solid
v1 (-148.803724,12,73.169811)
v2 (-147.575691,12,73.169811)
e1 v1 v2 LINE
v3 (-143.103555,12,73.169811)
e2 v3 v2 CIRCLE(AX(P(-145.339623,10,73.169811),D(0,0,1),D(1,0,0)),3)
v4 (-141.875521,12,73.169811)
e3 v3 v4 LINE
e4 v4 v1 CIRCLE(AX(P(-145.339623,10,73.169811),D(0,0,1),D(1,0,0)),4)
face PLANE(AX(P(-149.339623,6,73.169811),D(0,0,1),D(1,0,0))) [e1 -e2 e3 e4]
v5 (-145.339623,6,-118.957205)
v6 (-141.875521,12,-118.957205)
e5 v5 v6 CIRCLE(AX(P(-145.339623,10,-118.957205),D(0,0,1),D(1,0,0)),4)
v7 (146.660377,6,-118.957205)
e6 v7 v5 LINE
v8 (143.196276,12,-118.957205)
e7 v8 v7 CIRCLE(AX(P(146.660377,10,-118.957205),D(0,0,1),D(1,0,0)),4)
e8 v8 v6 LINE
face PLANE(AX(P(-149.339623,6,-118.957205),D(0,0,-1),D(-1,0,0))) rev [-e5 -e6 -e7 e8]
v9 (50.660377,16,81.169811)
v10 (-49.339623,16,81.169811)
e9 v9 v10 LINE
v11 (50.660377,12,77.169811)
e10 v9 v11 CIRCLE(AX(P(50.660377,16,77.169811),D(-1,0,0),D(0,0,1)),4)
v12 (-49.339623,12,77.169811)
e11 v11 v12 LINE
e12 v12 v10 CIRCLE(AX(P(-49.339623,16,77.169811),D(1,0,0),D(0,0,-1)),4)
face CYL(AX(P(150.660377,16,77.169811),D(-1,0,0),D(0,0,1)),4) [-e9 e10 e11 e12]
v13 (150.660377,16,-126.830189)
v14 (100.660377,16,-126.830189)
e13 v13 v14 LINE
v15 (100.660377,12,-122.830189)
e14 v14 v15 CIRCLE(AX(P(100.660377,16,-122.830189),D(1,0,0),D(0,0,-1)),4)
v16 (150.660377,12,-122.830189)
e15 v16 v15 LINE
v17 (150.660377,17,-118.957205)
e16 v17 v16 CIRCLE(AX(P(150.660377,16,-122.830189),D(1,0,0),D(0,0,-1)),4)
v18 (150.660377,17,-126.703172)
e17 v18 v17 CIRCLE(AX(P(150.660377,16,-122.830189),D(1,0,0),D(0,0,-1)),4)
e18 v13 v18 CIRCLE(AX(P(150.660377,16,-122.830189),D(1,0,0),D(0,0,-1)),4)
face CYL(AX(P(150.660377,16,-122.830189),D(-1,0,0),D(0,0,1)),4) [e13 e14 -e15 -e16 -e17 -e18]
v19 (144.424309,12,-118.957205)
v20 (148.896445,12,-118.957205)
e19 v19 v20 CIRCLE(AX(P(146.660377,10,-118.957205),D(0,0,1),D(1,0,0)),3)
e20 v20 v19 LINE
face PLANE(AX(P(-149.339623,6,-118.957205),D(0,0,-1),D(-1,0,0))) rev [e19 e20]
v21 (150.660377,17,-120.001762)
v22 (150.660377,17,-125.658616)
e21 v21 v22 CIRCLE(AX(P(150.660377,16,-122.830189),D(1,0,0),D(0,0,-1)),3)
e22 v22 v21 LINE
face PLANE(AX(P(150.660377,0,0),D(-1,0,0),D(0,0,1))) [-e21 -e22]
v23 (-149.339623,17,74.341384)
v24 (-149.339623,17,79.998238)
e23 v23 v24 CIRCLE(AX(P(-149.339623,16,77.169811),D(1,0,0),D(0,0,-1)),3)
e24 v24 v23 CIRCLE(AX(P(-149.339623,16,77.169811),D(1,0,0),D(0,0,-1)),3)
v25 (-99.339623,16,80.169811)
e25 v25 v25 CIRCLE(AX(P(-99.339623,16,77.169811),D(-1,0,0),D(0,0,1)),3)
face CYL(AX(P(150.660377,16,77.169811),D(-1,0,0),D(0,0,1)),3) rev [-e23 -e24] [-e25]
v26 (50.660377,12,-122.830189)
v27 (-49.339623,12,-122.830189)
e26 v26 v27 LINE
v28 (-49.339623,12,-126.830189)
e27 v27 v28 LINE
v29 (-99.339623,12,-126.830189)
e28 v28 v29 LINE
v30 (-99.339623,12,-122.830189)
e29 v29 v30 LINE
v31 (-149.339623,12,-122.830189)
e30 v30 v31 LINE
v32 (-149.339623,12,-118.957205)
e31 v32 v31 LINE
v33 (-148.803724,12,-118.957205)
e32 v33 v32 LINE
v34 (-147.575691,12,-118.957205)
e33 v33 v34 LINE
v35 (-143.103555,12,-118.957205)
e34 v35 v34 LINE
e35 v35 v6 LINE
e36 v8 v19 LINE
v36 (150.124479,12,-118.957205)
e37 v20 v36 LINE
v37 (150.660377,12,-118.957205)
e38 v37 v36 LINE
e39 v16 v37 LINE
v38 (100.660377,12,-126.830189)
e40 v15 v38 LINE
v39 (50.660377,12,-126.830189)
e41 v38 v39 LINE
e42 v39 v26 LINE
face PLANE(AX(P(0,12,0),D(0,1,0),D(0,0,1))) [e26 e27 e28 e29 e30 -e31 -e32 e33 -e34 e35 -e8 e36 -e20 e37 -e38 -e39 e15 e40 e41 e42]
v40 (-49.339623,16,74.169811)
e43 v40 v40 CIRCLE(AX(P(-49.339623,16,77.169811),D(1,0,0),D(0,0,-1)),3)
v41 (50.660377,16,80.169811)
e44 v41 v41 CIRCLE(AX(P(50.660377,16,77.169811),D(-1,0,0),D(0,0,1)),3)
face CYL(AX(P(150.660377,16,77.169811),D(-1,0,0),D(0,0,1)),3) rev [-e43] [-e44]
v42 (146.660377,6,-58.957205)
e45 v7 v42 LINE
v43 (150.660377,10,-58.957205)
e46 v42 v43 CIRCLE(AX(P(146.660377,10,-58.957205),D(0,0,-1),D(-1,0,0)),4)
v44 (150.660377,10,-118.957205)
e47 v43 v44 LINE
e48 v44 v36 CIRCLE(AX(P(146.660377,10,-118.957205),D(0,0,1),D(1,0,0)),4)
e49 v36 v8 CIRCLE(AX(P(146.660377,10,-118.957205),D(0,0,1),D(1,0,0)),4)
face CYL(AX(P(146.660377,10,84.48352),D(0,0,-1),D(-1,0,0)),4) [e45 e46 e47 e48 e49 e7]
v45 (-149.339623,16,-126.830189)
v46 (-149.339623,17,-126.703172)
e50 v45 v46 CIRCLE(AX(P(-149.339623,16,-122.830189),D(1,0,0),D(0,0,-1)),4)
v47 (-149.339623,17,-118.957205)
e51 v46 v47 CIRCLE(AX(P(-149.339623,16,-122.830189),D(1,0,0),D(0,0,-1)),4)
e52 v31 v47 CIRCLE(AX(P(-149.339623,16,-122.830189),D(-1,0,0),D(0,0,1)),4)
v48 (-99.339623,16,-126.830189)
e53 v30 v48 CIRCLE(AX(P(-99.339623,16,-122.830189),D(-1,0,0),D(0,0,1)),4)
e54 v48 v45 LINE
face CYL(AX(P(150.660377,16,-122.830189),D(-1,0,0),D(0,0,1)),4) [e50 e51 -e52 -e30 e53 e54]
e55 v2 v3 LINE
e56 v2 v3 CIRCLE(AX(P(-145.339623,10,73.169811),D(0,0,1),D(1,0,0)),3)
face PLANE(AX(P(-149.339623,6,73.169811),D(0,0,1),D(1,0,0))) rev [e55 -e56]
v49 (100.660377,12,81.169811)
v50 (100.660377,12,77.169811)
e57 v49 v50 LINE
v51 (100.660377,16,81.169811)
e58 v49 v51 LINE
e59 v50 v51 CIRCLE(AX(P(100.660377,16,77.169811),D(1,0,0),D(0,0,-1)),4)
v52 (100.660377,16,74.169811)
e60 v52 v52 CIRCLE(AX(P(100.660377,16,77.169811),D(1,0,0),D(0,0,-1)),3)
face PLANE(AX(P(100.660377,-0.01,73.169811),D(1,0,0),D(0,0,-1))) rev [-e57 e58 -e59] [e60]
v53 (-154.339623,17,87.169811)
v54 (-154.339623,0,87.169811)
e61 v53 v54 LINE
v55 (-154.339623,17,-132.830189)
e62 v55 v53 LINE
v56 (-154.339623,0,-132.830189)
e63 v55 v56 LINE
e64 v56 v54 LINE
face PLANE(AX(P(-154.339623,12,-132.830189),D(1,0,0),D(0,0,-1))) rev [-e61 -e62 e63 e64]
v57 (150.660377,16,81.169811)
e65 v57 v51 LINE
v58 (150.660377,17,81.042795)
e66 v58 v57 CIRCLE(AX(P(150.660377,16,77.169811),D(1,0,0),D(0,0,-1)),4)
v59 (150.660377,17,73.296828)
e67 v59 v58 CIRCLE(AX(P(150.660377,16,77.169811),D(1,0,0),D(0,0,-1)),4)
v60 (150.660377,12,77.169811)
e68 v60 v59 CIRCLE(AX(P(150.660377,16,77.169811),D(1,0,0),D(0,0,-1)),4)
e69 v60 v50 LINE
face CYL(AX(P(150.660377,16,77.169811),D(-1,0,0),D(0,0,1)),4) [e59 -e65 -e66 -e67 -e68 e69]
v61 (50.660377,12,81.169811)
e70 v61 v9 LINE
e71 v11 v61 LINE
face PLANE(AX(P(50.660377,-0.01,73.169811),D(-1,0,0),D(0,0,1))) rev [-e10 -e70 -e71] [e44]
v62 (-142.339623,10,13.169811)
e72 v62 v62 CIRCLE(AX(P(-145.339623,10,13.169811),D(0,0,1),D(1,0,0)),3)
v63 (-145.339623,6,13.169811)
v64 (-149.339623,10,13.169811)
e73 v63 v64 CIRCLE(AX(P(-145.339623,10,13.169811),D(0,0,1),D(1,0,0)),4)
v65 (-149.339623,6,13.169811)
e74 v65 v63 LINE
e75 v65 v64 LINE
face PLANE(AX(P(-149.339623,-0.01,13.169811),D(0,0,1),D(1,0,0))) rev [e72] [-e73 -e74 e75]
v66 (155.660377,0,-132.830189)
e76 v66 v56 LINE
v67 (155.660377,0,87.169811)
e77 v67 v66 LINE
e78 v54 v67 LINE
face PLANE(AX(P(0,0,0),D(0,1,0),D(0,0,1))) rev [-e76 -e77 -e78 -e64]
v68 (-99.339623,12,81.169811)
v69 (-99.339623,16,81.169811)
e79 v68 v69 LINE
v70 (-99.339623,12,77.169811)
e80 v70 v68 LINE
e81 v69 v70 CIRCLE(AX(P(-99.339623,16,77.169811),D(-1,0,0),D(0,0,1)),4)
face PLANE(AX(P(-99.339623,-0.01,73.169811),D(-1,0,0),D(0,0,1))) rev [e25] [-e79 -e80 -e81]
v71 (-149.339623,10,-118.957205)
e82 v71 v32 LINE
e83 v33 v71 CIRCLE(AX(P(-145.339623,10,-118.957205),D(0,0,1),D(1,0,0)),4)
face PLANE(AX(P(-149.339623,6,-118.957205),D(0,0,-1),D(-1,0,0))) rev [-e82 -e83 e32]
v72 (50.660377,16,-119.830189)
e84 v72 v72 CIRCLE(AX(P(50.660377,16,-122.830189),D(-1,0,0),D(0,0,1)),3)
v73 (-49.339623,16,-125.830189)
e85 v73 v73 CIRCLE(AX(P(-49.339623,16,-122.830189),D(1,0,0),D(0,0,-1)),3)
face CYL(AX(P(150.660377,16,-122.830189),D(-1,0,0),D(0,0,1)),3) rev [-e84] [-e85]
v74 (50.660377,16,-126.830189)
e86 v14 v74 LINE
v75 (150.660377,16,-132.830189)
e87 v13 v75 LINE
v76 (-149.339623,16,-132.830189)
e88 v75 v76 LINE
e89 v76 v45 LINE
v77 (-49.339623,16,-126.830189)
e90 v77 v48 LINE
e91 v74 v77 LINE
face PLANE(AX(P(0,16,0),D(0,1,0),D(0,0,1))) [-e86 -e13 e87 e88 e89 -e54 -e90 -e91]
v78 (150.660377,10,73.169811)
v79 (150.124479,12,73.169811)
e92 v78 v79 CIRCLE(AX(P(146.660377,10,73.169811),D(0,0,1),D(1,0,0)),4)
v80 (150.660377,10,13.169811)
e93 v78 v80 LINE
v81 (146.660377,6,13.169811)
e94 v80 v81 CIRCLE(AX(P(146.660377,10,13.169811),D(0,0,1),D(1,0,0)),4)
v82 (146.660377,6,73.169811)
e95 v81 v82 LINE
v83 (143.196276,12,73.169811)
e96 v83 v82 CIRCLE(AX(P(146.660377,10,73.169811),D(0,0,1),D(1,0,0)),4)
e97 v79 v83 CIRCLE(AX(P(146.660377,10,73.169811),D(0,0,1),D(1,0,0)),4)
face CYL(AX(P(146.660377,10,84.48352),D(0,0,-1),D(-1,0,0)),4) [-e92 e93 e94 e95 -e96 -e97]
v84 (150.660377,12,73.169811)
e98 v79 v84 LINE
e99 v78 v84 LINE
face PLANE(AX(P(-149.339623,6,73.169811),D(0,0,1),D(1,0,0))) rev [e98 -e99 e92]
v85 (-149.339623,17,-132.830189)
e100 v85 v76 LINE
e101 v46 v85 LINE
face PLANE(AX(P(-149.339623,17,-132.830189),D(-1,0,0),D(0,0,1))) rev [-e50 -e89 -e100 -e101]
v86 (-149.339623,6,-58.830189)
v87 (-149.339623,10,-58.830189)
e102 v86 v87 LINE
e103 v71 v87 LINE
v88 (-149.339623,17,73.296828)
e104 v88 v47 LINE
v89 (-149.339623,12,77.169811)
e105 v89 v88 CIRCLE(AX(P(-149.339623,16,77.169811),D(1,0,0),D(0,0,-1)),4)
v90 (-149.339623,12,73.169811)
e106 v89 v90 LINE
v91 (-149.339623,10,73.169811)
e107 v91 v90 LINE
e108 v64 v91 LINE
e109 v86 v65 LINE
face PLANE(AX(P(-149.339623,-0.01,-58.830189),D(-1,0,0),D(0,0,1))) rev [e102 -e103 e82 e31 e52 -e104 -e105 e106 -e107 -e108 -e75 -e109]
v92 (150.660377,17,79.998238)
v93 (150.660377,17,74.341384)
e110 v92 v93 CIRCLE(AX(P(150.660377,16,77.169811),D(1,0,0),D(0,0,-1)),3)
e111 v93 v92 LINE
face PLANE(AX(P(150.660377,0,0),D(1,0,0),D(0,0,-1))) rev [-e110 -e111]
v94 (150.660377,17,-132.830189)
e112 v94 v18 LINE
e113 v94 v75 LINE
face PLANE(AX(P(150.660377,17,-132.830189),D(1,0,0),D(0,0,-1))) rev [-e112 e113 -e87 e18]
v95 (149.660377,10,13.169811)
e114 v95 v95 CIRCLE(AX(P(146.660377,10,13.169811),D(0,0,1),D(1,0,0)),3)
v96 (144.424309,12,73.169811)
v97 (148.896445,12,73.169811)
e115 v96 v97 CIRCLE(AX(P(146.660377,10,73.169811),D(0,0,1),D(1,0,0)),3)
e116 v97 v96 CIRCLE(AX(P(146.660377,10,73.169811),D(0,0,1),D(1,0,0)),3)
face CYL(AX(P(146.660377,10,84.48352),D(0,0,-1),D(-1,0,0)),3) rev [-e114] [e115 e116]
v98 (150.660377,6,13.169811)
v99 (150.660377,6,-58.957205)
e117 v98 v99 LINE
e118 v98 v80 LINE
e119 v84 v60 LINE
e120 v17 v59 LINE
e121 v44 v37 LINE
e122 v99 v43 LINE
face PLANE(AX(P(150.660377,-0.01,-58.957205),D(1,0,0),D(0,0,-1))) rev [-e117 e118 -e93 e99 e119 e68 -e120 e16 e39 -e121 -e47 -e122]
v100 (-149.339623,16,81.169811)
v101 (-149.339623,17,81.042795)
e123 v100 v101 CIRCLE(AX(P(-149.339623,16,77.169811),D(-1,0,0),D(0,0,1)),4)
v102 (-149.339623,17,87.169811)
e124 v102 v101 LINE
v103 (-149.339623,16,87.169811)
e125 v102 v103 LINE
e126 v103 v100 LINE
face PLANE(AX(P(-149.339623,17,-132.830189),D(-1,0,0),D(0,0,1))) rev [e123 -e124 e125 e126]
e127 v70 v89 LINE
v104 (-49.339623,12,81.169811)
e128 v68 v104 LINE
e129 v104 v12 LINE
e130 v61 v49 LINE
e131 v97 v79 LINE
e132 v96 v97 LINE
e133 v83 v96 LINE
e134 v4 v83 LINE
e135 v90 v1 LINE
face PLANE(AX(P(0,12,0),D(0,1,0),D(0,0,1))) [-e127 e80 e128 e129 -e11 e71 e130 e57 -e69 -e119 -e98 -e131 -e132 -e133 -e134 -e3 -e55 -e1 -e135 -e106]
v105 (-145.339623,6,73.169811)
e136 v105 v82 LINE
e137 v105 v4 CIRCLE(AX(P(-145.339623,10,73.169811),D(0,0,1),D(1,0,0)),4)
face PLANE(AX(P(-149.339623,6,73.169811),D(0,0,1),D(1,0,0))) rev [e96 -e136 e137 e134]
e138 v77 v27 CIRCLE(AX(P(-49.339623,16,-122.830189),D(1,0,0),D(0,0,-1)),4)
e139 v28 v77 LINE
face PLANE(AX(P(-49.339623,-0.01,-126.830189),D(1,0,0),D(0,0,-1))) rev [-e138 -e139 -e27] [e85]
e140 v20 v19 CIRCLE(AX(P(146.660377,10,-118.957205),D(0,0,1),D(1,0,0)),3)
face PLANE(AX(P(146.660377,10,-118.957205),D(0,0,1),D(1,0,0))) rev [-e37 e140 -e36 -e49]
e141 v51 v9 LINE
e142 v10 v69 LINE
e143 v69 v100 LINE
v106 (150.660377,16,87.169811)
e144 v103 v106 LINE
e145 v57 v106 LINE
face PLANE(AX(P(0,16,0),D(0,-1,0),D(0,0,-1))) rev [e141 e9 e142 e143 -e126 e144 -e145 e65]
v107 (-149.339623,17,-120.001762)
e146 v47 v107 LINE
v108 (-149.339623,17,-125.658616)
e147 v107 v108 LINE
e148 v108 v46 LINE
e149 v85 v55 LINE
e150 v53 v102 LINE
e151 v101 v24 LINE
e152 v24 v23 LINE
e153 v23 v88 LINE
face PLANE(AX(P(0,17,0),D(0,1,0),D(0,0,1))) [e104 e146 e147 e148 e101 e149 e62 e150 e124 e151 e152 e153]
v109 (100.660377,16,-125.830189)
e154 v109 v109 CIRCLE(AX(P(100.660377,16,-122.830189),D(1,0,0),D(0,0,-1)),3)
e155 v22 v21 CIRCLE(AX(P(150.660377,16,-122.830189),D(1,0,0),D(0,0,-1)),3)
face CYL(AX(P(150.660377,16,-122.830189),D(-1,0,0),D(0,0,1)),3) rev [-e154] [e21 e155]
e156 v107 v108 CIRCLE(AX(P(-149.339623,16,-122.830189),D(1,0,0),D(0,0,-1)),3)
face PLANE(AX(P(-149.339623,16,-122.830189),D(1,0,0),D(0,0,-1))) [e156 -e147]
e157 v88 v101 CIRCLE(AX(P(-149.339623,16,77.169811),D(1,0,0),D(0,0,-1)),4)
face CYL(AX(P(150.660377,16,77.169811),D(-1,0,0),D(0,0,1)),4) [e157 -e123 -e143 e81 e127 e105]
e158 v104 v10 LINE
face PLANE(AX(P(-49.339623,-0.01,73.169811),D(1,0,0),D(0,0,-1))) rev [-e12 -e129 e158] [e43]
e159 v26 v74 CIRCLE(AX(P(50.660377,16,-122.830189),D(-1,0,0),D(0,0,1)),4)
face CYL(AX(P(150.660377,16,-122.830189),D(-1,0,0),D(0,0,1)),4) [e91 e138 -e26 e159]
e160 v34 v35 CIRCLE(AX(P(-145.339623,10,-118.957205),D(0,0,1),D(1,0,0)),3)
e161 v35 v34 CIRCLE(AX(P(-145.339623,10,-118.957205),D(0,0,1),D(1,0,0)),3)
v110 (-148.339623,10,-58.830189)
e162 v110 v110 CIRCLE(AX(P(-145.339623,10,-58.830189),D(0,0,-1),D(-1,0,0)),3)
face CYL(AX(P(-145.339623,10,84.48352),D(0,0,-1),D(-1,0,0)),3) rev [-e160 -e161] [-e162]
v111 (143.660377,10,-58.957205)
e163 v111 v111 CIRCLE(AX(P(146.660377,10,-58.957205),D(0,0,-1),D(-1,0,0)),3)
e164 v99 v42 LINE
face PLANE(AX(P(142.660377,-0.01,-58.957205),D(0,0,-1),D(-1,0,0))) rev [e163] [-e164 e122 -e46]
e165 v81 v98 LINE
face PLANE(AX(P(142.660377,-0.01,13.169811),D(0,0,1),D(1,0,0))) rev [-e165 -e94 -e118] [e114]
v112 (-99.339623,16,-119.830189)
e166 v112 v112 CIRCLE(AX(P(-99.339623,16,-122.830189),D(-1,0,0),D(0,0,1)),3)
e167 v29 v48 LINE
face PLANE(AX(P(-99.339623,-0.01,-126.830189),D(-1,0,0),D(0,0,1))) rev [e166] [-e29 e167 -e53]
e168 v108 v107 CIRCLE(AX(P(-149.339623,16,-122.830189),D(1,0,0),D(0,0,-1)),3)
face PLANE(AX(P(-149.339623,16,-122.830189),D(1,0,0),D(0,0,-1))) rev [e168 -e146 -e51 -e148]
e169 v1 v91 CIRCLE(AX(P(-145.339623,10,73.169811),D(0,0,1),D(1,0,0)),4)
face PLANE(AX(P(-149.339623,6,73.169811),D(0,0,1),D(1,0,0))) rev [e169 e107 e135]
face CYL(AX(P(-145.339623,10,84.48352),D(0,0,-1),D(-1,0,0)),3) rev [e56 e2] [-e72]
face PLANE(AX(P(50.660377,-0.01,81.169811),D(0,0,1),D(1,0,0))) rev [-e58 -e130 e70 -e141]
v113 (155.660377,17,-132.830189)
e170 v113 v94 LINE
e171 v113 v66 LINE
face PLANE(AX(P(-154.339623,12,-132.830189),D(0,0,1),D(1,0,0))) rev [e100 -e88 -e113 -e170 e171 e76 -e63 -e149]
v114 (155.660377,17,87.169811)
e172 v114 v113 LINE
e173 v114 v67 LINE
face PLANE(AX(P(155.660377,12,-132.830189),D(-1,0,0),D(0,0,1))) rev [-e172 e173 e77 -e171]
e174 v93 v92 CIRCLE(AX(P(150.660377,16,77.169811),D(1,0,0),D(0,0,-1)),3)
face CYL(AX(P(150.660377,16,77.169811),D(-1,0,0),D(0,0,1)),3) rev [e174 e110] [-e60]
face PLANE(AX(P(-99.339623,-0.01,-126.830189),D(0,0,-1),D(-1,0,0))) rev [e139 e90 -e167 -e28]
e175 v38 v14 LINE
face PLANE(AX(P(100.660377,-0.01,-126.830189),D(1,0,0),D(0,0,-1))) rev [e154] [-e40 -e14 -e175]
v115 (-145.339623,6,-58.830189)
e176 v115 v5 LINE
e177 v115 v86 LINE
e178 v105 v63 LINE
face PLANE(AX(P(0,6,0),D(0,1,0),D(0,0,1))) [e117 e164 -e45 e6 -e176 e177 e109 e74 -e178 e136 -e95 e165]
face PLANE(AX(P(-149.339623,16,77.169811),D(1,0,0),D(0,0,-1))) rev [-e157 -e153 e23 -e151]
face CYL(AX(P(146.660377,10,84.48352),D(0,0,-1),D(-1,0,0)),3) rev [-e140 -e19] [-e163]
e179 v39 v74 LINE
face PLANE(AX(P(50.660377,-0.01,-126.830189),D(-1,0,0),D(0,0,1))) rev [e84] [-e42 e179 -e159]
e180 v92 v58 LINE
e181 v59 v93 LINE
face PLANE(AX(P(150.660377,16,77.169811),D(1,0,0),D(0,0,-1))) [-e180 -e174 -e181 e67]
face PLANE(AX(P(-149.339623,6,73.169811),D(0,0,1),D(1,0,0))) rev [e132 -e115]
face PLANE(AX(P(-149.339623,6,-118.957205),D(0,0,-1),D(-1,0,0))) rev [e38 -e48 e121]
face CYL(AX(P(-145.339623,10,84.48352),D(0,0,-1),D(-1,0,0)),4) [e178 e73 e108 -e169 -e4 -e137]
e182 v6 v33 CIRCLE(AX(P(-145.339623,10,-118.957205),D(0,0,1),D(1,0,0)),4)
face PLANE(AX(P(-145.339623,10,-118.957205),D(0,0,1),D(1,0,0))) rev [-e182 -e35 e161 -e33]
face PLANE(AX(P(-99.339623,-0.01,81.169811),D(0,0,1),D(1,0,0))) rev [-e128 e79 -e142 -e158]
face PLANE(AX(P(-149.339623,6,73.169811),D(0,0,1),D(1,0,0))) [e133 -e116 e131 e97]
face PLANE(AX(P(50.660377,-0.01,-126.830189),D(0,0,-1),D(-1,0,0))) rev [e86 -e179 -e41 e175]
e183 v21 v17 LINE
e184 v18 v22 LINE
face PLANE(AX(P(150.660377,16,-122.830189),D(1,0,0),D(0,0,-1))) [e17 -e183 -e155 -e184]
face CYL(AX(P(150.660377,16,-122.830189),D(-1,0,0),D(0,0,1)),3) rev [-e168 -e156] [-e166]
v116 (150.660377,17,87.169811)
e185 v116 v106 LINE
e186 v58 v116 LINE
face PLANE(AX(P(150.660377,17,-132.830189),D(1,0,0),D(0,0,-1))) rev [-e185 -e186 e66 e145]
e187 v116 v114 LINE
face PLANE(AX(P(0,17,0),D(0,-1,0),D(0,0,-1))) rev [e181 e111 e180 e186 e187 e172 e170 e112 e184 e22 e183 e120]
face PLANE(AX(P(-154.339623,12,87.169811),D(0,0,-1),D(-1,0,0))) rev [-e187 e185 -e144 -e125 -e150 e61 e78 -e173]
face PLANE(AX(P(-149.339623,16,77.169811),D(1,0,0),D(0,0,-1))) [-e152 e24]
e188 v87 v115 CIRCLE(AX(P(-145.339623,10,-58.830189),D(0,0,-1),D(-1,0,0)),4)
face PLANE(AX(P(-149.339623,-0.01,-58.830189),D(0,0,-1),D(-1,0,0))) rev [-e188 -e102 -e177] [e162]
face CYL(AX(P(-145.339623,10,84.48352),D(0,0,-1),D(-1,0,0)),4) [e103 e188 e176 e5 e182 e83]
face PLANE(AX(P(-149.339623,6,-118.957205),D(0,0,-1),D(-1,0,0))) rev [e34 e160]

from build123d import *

# Parameters (mm, degrees)
SKETCH_1_W                 = 310
SKETCH_1_H                 = 220
EXTRUDE_1_DEPTH            = 12
SKETCH_8_W                 = 310
SKETCH_8_H                 = 10
EXTRUDE_12_DEPTH           = 4
SKETCH_10_R                = 4
CUT_EXTRUDE_5_DEPTH        = 305
SKETCH_11_W                = 4
SKETCH_11_H                = 4
EXTRUDE_13_DEPTH           = 5
EXTRUDE_START              = 300
SKETCH_12_R                = 4
SKETCH_12_R_2              = 3
EXTRUDE_1_2_DEPTH          = 300
SKETCH_15_W                = 5
SKETCH_15_H                = 220
EXTRUDE_15_DEPTH           = 5
SPLIT_START                = -99.339622642
SPLIT_BODIES_1_OUTLINE_R   = 3
SPLIT_BODIES_1_DEPTH       = 50
SPLIT_START_2              = 50.660377358
SPLIT_BODIES_1_2_OUTLINE_R = 3
SPLIT_BODIES_1_2_DEPTH     = 50
SKETCH_16_W                = 50
SKETCH_16_H                = 8
EXTRUDE_16_DEPTH           = 12
SKETCH_19_W                = 300
SKETCH_19_H                = 192.127016654
CUT_EXTRUDE_6_DEPTH        = 6
SKETCH_22_W                = 4
SKETCH_22_H                = 192.127016654
EXTRUDE_17_DEPTH           = 4
SKETCH_23_R                = 4
CUT_EXTRUDE_8_DEPTH        = 192.127016654
SKETCH_23_3_R              = 4
SKETCH_23_3_R_2            = 3
EXTRUDE_2_DEPTH            = 192.127016654
SPLIT_START_3              = -58.830188679
SPLIT_BODIES_2_OUTLINE_R   = 3
SPLIT_BODIES_2_DEPTH       = 72
SPLIT_START_4              = -58.957205333
SPLIT_BODIES_2_2_OUTLINE_R = 3
SPLIT_BODIES_2_2_DEPTH     = 0.127016654
SKETCH_24_W                = 8
SKETCH_24_H                = 72
SKETCH_24_H_2              = 72.127016654
EXTRUDE_18_DEPTH           = 6


# Read off the part's stored shape, not the designer's step: 分割1, 分割2
with BuildPart() as part:
    # 草图1 → Extrude 1 (new body)
    with BuildSketch(Plane(origin=(0, 0, 0), x_dir=(1, 0, 0), z_dir=(0, 1, 0))):
        with Locations((0.660377358, 22.830188679)):
            Rectangle(SKETCH_1_W, SKETCH_1_H)
    extrude(amount=EXTRUDE_1_DEPTH)

    # 草图8 → 凸台-拉伸12 (add)
    with BuildSketch(Plane(origin=(0, 12, 0), x_dir=(1, 0, 0), z_dir=(0, 1, 0))):
        with Locations((0.660377358, 127.830188679)):
            Rectangle(SKETCH_8_W, SKETCH_8_H)
        with Locations((0.660377358, -82.169811321)):
            Rectangle(SKETCH_8_W, SKETCH_8_H)
    extrude(amount=EXTRUDE_12_DEPTH)

    # 草图10 → 切除-拉伸5 (cut)
    with BuildSketch(Plane(origin=(155.660377358, 0, 0), x_dir=(0, 0, -1), z_dir=(1, 0, 0))):
        with Locations((-77.169811321, 16)):
            Circle(SKETCH_10_R)
        with Locations((122.830188679, 16)):
            Circle(SKETCH_10_R)
    extrude(amount=-CUT_EXTRUDE_5_DEPTH, mode=Mode.SUBTRACT)

    # 草图11 → 凸台-拉伸13 (add)
    with BuildSketch(Plane(origin=(155.660377358, 0, 0), x_dir=(0, 0, -1), z_dir=(1, 0, 0))):
        with Locations((-79.169811321, 14)):
            Rectangle(SKETCH_11_W, SKETCH_11_H)
        with Locations((124.830188679, 14)):
            Rectangle(SKETCH_11_W, SKETCH_11_H)
    extrude(amount=-EXTRUDE_13_DEPTH)

    # 草图12 → Extrude 1 2 (add)
    # profile 1 of 2: a face of its own
    with BuildSketch(Plane(origin=(-149.339622642, 0, 0), x_dir=(0, 0, -1), z_dir=(1, 0, 0)).offset(EXTRUDE_START)):
        with Locations((-77.169811321, 16)):
            Circle(SKETCH_12_R)
        with Locations((-77.169811321, 16)):
            Circle(SKETCH_12_R_2, mode=Mode.SUBTRACT)
    # profile 2 of 2: a face of its own
    with BuildSketch(Plane(origin=(-149.339622642, 0, 0), x_dir=(0, 0, -1), z_dir=(1, 0, 0)).offset(EXTRUDE_START)):
        with Locations((122.830188679, 16)):
            Circle(SKETCH_12_R)
        with Locations((122.830188679, 16)):
            Circle(SKETCH_12_R_2, mode=Mode.SUBTRACT)
    extrude(amount=-EXTRUDE_1_2_DEPTH)

    # 草图15 → 凸台-拉伸15 (add)
    with BuildSketch(Plane(origin=(0, 12, 0), x_dir=(1, 0, 0), z_dir=(0, 1, 0))):
        with Locations((-151.839622642, 22.830188679)):
            Rectangle(SKETCH_15_W, SKETCH_15_H)
        with Locations((153.160377358, 22.830188679)):
            Rectangle(SKETCH_15_W, SKETCH_15_H)
    extrude(amount=EXTRUDE_15_DEPTH)

    # Split Bodies 1 outline → Split Bodies 1 (cut)
    # profile 1 of 2: a face of its own
    with BuildSketch(Plane.YZ.offset(SPLIT_START)):
        with BuildLine():
            ThreePointArc((12, 77.169811321), (18.828427125, 74.341384196), (16, 81.169811321))
            Line((16, 81.169811321), (0, 81.169811321))
            Line((0, 81.169811321), (0, 73.169811321))
            Line((0, 73.169811321), (12, 73.169811321))
            Line((12, 73.169811321), (12, 77.169811321))
        make_face()
        with Locations((16, 77.169811321)):
            Circle(SPLIT_BODIES_1_OUTLINE_R, mode=Mode.SUBTRACT)
    # profile 2 of 2: a face of its own
    with BuildSketch(Plane.YZ.offset(SPLIT_START)):
        with BuildLine():
            Line((12, -118.830188679), (0, -118.830188679))
            Line((0, -118.830188679), (0, -126.830188679))
            Line((0, -126.830188679), (16, -126.830188679))
            ThreePointArc((16, -126.830188679), (18.828427125, -120.001761554), (12, -122.830188679))
            Line((12, -122.830188679), (12, -118.830188679))
        make_face()
        with Locations((16, -122.830188679)):
            Circle(SPLIT_BODIES_1_OUTLINE_R, mode=Mode.SUBTRACT)
    extrude(amount=SPLIT_BODIES_1_DEPTH, mode=Mode.SUBTRACT)

    # Split Bodies 1 2 outline → Split Bodies 1 2 (cut)
    # profile 1 of 2: a face of its own
    with BuildSketch(Plane.YZ.offset(SPLIT_START_2)):
        with BuildLine():
            ThreePointArc((12, 77.169811321), (18.828427125, 74.341384196), (16, 81.169811321))
            Line((16, 81.169811321), (0, 81.169811321))
            Line((0, 81.169811321), (0, 73.169811321))
            Line((0, 73.169811321), (12, 73.169811321))
            Line((12, 73.169811321), (12, 77.169811321))
        make_face()
        with Locations((16, 77.169811321)):
            Circle(SPLIT_BODIES_1_2_OUTLINE_R, mode=Mode.SUBTRACT)
    # profile 2 of 2: a face of its own
    with BuildSketch(Plane.YZ.offset(SPLIT_START_2)):
        with BuildLine():
            Line((12, -118.830188679), (0, -118.830188679))
            Line((0, -118.830188679), (0, -126.830188679))
            Line((0, -126.830188679), (16, -126.830188679))
            ThreePointArc((16, -126.830188679), (18.828427125, -120.001761554), (12, -122.830188679))
            Line((12, -122.830188679), (12, -118.830188679))
        make_face()
        with Locations((16, -122.830188679)):
            Circle(SPLIT_BODIES_1_2_OUTLINE_R, mode=Mode.SUBTRACT)
    extrude(amount=SPLIT_BODIES_1_2_DEPTH, mode=Mode.SUBTRACT)

    # 草图16 → 凸台-拉伸16 (add)
    with BuildSketch(Plane(origin=(0, 12, 0), x_dir=(1, 0, 0), z_dir=(0, 1, 0))):
        with Locations((-74.339622642, 122.830188679)):
            Rectangle(SKETCH_16_W, SKETCH_16_H)
        with Locations((75.660377358, 122.830188679)):
            Rectangle(SKETCH_16_W, SKETCH_16_H)
        with Locations((-74.339622642, -77.169811321)):
            Rectangle(SKETCH_16_W, SKETCH_16_H)
        with Locations((75.660377358, -77.169811321)):
            Rectangle(SKETCH_16_W, SKETCH_16_H)
    extrude(amount=-EXTRUDE_16_DEPTH)

    # 草图19 → 切除-拉伸6 (cut)
    with BuildSketch(Plane(origin=(0, 12, 0), x_dir=(1, 0, 0), z_dir=(0, 1, 0))):
        with Locations((0.660377358, 22.893697006)):
            Rectangle(SKETCH_19_W, SKETCH_19_H)
    extrude(amount=-CUT_EXTRUDE_6_DEPTH, mode=Mode.SUBTRACT)

    # 草图22 → 凸台-拉伸17 (add)
    with BuildSketch(Plane(origin=(0, 6, 0), x_dir=(1, 0, 0), z_dir=(0, 1, 0))):
        with Locations((-147.339622642, 22.893697006)):
            Rectangle(SKETCH_22_W, SKETCH_22_H)
        with Locations((148.660377358, 22.893697006)):
            Rectangle(SKETCH_22_W, SKETCH_22_H)
    extrude(amount=EXTRUDE_17_DEPTH)

    # 草图23 → 切除-拉伸8 (cut)
    with BuildSketch(Plane.XY.offset(-118.957205333)):
        with Locations((-145.339622642, 10)):
            Circle(SKETCH_23_R)
        with Locations((146.660377358, 10)):
            Circle(SKETCH_23_R)
    extrude(amount=CUT_EXTRUDE_8_DEPTH, mode=Mode.SUBTRACT)

    # 草图23<3> → 拉伸-薄壁2 (add)
    # profile 1 of 2: a face of its own
    with BuildSketch(Plane.XY.offset(-118.957205333)):
        with Locations((-145.339622642, 10)):
            Circle(SKETCH_23_3_R)
        with Locations((-145.339622642, 10)):
            Circle(SKETCH_23_3_R_2, mode=Mode.SUBTRACT)
    # profile 2 of 2: a face of its own
    with BuildSketch(Plane.XY.offset(-118.957205333)):
        with Locations((146.660377358, 10)):
            Circle(SKETCH_23_3_R)
        with Locations((146.660377358, 10)):
            Circle(SKETCH_23_3_R_2, mode=Mode.SUBTRACT)
    extrude(amount=EXTRUDE_2_DEPTH)

    # Split Bodies 2 outline → Split Bodies 2 (cut)
    # profile 1 of 2: a face of its own
    with BuildSketch(Plane.XY.offset(SPLIT_START_3)):
        with BuildLine():
            Line((-149.339622642, 0), (-141.339622642, 0))
            Line((-141.339622642, 0), (-141.339622642, 6))
            Line((-141.339622642, 6), (-145.339622642, 6))
            ThreePointArc((-145.339622642, 6), (-142.511195517, 12.828427125), (-149.339622642, 10))
            Line((-149.339622642, 10), (-149.339622642, 0))
        make_face()
        with Locations((-145.339622642, 10)):
            Circle(SPLIT_BODIES_2_OUTLINE_R, mode=Mode.SUBTRACT)
    # profile 2 of 2: a face of its own
    with BuildSketch(Plane.XY.offset(SPLIT_START_3)):
        with BuildLine():
            Line((142.660377358, 6), (142.660377358, 0))
            Line((142.660377358, 0), (150.660377358, 0))
            Line((150.660377358, 0), (150.660377358, 10))
            ThreePointArc((150.660377358, 10), (143.831950234, 12.828427125), (146.660377358, 6))
            Line((146.660377358, 6), (142.660377358, 6))
        make_face()
        with Locations((146.660377358, 10)):
            Circle(SPLIT_BODIES_2_OUTLINE_R, mode=Mode.SUBTRACT)
    extrude(amount=SPLIT_BODIES_2_DEPTH, mode=Mode.SUBTRACT)

    # Split Bodies 2 2 outline → Split Bodies 2 2 (cut)
    with BuildSketch(Plane.XY.offset(SPLIT_START_4)):
        with BuildLine():
            Line((142.660377358, 6), (142.660377358, 0))
            Line((142.660377358, 0), (150.660377358, 0))
            Line((150.660377358, 0), (150.660377358, 10))
            ThreePointArc((150.660377358, 10), (143.831950234, 12.828427125), (146.660377358, 6))
            Line((146.660377358, 6), (142.660377358, 6))
        make_face()
        with Locations((146.660377358, 10)):
            Circle(SPLIT_BODIES_2_2_OUTLINE_R, mode=Mode.SUBTRACT)
    extrude(amount=SPLIT_BODIES_2_2_DEPTH, mode=Mode.SUBTRACT)

    # 草图24 → 凸台-拉伸18 (add)
    with BuildSketch(Plane(origin=(0, 6, 0), x_dir=(1, 0, 0), z_dir=(0, 1, 0))):
        with Locations((-145.339622642, 22.830188679)):
            Rectangle(SKETCH_24_W, SKETCH_24_H)
        with Locations((146.660377358, 22.893697006)):
            Rectangle(SKETCH_24_W, SKETCH_24_H_2)
    extrude(amount=-EXTRUDE_18_DEPTH)


solid = part.part
